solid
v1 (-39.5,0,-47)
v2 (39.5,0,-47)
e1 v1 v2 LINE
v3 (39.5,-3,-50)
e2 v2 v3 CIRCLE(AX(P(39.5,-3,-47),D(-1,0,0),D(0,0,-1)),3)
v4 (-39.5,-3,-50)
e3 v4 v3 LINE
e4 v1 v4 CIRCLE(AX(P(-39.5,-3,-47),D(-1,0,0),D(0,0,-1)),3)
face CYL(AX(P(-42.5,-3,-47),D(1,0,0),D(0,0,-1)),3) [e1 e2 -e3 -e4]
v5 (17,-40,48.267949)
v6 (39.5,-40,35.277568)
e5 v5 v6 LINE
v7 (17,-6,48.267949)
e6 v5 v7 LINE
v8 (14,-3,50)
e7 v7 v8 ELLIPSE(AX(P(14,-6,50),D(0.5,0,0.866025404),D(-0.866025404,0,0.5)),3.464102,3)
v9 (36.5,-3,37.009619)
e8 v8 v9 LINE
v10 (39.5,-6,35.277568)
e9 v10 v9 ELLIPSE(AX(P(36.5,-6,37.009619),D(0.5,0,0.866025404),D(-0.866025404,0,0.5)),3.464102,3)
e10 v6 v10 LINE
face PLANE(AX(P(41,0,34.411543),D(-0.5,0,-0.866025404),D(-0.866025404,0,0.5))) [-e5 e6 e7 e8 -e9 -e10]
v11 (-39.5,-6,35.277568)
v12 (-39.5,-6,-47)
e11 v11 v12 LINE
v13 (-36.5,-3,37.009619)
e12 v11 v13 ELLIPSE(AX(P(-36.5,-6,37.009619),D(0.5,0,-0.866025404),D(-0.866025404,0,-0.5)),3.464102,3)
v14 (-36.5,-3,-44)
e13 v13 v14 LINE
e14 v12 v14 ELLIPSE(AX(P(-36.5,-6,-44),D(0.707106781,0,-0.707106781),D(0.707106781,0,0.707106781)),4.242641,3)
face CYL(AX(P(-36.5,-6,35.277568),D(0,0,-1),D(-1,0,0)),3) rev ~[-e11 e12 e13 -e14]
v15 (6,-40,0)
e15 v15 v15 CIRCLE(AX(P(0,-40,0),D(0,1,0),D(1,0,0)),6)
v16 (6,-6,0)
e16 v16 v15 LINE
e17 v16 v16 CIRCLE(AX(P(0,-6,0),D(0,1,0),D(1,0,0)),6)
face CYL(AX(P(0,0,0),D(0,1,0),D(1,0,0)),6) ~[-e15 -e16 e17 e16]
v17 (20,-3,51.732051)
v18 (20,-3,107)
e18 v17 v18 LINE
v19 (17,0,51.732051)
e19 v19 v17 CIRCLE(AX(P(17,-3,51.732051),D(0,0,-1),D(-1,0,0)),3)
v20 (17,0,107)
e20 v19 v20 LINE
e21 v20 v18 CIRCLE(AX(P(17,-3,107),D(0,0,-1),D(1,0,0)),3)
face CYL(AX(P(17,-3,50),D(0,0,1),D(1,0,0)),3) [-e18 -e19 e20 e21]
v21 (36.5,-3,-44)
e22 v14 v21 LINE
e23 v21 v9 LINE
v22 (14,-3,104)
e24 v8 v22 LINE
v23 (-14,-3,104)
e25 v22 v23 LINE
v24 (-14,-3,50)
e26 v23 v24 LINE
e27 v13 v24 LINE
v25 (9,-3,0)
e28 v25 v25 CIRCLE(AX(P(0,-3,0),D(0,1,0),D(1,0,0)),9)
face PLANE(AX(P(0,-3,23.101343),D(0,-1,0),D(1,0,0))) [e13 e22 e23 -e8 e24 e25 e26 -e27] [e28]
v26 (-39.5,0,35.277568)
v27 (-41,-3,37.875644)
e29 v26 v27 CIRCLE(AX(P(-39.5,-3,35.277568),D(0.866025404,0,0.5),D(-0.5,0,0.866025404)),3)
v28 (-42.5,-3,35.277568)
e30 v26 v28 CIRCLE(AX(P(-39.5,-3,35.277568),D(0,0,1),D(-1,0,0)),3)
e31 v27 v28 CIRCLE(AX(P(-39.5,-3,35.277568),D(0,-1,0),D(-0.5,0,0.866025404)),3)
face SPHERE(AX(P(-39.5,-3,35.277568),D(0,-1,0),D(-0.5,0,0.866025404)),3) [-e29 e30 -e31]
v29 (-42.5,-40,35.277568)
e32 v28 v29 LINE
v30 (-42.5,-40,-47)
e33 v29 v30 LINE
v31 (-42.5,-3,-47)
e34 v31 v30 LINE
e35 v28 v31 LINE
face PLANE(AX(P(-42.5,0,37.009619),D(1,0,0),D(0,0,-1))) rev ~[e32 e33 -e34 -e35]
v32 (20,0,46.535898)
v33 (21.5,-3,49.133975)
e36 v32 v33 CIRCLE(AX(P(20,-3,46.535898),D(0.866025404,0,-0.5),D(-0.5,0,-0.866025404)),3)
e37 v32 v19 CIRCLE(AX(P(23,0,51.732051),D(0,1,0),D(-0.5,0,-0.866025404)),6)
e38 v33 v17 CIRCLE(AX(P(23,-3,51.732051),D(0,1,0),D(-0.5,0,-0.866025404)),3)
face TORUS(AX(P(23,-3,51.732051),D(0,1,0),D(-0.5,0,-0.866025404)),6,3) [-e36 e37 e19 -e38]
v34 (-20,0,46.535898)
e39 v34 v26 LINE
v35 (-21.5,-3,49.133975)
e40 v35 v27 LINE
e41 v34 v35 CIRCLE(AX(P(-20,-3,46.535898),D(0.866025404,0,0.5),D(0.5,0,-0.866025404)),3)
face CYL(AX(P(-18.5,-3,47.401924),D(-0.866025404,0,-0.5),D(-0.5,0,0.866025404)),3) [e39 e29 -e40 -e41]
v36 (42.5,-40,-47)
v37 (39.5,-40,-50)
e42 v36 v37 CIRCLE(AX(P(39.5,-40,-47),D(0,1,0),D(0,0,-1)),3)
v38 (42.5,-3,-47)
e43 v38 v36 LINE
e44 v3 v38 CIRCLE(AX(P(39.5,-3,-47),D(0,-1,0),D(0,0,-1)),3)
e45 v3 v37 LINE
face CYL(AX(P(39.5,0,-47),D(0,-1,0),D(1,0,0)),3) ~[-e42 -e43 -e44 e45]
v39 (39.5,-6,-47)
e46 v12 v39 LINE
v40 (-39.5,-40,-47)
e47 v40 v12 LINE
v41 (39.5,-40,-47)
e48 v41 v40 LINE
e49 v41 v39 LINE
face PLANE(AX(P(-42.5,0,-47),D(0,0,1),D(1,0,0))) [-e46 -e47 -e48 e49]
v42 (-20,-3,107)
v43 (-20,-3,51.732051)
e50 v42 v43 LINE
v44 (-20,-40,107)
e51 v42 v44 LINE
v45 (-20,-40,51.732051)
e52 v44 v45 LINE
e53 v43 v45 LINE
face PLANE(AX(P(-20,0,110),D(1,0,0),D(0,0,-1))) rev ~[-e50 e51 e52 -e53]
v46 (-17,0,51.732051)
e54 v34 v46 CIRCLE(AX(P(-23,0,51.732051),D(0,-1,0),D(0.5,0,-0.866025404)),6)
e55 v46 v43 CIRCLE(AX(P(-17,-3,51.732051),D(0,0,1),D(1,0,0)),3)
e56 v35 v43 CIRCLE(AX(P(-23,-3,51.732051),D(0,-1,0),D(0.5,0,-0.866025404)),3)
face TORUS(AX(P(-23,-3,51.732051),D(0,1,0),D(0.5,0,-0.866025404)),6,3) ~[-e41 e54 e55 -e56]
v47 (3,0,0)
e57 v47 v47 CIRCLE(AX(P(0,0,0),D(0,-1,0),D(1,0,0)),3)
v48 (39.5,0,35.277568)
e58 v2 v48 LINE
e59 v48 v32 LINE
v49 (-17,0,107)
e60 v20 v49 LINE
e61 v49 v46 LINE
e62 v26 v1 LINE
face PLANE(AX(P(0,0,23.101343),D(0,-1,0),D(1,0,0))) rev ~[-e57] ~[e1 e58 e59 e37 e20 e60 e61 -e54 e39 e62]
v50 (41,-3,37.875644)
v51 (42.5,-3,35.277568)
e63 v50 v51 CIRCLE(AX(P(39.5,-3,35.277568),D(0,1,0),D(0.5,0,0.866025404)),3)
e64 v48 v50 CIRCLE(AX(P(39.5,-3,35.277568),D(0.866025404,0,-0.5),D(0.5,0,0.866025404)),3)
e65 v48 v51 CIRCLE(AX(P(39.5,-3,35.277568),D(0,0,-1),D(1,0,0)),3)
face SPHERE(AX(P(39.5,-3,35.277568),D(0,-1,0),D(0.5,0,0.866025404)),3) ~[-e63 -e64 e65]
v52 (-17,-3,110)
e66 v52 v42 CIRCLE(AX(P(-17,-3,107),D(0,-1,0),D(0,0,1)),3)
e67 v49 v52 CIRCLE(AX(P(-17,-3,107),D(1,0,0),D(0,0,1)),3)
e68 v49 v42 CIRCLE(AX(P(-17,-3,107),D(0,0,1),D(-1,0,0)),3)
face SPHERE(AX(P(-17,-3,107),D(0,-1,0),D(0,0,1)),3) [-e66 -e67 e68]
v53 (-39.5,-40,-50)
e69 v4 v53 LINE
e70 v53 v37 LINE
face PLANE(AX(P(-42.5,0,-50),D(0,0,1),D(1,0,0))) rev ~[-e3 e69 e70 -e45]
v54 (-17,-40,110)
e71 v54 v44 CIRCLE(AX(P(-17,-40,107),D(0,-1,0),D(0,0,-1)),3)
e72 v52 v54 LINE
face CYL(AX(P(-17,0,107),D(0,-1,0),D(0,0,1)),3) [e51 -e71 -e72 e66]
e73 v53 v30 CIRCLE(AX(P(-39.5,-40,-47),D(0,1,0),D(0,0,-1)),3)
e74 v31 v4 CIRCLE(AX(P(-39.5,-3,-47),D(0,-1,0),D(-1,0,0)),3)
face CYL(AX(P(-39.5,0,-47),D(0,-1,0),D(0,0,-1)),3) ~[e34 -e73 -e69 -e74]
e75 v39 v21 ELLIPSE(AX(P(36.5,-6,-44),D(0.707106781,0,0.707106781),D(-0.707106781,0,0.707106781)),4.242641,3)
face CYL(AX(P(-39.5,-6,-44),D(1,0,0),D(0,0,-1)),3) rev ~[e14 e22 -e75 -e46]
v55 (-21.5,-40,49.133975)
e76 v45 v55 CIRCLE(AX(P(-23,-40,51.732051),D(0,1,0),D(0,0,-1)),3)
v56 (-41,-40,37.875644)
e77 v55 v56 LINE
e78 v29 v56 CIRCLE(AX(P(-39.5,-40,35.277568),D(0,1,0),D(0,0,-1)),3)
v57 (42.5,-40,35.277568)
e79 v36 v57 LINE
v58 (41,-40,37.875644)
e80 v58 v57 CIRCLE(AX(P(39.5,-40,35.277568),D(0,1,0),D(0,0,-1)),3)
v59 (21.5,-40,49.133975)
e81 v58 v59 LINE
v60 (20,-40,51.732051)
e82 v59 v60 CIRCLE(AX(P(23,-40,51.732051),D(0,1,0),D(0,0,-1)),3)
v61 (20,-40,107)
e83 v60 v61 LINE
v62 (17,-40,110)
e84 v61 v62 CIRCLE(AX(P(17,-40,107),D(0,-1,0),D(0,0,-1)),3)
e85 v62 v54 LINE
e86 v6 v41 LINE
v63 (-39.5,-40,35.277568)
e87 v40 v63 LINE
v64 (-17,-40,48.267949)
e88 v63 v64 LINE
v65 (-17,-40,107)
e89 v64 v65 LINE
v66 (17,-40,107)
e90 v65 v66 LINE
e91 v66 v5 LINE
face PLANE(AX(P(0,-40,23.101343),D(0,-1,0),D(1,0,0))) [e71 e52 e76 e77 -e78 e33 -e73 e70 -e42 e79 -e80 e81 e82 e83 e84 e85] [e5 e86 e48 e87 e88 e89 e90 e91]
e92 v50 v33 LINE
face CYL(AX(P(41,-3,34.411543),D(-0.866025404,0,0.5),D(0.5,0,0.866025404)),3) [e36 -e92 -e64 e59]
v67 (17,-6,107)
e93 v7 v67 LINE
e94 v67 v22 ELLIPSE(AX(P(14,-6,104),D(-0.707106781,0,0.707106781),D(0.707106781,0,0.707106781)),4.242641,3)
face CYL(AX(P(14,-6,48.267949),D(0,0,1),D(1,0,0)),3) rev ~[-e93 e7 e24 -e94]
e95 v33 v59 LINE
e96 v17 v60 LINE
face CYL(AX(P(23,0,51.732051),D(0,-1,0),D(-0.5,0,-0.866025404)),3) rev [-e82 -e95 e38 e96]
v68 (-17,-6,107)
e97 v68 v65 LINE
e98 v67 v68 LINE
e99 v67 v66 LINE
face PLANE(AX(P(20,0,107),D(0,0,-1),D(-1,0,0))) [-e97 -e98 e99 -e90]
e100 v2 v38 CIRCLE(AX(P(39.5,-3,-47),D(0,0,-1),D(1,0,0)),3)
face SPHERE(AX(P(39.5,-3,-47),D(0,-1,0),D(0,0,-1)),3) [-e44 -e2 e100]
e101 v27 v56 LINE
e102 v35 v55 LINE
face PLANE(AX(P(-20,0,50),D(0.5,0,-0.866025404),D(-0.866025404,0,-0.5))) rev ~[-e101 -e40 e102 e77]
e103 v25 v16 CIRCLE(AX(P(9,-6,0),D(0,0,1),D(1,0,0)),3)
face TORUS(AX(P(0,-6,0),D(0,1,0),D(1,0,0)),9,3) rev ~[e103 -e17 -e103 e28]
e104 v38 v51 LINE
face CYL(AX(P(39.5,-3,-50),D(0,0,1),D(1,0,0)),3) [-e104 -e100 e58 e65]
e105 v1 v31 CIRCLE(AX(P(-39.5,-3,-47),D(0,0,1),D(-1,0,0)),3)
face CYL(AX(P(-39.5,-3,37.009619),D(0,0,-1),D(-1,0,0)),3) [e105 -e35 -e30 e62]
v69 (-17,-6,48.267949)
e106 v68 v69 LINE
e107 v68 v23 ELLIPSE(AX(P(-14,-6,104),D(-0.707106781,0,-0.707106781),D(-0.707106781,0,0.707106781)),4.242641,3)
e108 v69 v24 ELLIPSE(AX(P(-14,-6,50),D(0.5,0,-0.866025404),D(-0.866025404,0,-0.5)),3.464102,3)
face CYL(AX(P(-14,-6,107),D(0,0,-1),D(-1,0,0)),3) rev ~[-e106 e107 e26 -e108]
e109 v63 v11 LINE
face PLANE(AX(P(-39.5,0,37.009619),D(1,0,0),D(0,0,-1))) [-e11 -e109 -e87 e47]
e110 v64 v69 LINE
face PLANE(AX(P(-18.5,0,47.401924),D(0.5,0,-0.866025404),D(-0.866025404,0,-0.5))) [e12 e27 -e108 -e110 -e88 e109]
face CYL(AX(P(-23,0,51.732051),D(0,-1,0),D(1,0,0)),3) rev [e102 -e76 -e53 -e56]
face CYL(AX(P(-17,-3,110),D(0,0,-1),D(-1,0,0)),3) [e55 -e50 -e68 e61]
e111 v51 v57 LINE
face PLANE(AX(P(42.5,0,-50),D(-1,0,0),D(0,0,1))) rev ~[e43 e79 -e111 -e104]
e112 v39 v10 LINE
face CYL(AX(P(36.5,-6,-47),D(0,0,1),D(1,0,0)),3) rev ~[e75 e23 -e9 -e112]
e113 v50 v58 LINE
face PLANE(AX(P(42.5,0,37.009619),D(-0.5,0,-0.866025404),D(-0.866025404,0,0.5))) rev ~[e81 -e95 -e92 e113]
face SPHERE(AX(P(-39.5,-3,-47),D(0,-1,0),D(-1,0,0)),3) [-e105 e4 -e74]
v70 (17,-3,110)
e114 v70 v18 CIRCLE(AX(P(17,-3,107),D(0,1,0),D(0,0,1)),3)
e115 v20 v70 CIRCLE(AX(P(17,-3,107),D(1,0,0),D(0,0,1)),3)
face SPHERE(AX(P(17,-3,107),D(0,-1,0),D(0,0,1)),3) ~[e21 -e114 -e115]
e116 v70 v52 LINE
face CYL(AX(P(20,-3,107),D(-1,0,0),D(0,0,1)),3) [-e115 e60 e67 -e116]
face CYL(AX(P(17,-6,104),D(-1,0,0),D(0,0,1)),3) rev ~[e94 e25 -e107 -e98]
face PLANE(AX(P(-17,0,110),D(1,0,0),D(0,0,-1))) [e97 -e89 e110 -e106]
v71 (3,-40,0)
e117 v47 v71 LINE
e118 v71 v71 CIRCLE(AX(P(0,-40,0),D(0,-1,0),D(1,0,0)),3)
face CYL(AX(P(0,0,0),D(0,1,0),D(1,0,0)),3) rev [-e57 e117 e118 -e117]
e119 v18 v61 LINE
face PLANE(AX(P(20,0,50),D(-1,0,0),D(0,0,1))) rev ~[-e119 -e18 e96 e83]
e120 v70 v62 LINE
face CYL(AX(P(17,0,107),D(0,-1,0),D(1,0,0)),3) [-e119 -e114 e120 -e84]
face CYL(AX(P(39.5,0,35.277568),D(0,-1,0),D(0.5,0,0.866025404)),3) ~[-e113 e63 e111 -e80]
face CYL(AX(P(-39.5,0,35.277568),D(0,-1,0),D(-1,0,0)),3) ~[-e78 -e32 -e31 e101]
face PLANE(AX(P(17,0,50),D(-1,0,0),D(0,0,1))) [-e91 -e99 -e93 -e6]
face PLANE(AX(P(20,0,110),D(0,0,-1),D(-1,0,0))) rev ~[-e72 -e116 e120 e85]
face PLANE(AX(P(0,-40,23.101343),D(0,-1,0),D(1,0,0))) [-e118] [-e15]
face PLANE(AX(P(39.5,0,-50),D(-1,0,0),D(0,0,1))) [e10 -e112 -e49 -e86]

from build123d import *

# Parameters (mm, degrees)
F1_R     = 3
F2_DEPTH = 40
F3_T     = -3
F4_R     = 3


with BuildPart() as f2:
    # F1 (on Front) → F2 (new body)
    with BuildSketch(Plane.XZ):
        Polygon((42.5, 37.0096189432), (20, 50), (20, 110), (-20, 110), (-20, 50), (-42.5, 37.0096189432), (-42.5, -50), (42.5, -50), align=None)
        Circle(F1_R, mode=Mode.SUBTRACT)
    extrude(amount=F2_DEPTH)

    # F3
    f3_openings = [f2.faces().sort_by_distance(p)[0] for p in [
        (0, -40, 16.88666),
    ]]
    offset(amount=F3_T, openings=f3_openings, kind=Kind.INTERSECTION)

    # F4
    f4_edges = [f2.edges().sort_by_distance(p)[0] for p in [
        (39.5, -3, -5.861216),
        (0, -3, -47),
        (-39.5, -3, -5.861216),
        (17, -3, 77.633975),
        (0, -3, 107),
        (-17, -3, 77.633975),
        (-20, -20, 110),
        (20, -20, 110),
        (42.5, -20, -50),
        (-42.5, -20, -50),
        (0, 0, 110),
        (20, 0, 80),
        (-42.5, 0, -6.495191),
        (-20, 0, 80),
        (0, 0, -50),
        (42.5, 0, -6.495191),
        (-6, -3, 0),
        (42.5, -20, 37.009619),
        (20, -20, 50),
        (31.25, 0, 43.504809),
        (-20, -20, 50),
        (-42.5, -20, 37.009619),
        (-31.25, 0, 43.504809),
    ]]
    fillet(f4_edges, radius=F4_R)


solid = f2.part
